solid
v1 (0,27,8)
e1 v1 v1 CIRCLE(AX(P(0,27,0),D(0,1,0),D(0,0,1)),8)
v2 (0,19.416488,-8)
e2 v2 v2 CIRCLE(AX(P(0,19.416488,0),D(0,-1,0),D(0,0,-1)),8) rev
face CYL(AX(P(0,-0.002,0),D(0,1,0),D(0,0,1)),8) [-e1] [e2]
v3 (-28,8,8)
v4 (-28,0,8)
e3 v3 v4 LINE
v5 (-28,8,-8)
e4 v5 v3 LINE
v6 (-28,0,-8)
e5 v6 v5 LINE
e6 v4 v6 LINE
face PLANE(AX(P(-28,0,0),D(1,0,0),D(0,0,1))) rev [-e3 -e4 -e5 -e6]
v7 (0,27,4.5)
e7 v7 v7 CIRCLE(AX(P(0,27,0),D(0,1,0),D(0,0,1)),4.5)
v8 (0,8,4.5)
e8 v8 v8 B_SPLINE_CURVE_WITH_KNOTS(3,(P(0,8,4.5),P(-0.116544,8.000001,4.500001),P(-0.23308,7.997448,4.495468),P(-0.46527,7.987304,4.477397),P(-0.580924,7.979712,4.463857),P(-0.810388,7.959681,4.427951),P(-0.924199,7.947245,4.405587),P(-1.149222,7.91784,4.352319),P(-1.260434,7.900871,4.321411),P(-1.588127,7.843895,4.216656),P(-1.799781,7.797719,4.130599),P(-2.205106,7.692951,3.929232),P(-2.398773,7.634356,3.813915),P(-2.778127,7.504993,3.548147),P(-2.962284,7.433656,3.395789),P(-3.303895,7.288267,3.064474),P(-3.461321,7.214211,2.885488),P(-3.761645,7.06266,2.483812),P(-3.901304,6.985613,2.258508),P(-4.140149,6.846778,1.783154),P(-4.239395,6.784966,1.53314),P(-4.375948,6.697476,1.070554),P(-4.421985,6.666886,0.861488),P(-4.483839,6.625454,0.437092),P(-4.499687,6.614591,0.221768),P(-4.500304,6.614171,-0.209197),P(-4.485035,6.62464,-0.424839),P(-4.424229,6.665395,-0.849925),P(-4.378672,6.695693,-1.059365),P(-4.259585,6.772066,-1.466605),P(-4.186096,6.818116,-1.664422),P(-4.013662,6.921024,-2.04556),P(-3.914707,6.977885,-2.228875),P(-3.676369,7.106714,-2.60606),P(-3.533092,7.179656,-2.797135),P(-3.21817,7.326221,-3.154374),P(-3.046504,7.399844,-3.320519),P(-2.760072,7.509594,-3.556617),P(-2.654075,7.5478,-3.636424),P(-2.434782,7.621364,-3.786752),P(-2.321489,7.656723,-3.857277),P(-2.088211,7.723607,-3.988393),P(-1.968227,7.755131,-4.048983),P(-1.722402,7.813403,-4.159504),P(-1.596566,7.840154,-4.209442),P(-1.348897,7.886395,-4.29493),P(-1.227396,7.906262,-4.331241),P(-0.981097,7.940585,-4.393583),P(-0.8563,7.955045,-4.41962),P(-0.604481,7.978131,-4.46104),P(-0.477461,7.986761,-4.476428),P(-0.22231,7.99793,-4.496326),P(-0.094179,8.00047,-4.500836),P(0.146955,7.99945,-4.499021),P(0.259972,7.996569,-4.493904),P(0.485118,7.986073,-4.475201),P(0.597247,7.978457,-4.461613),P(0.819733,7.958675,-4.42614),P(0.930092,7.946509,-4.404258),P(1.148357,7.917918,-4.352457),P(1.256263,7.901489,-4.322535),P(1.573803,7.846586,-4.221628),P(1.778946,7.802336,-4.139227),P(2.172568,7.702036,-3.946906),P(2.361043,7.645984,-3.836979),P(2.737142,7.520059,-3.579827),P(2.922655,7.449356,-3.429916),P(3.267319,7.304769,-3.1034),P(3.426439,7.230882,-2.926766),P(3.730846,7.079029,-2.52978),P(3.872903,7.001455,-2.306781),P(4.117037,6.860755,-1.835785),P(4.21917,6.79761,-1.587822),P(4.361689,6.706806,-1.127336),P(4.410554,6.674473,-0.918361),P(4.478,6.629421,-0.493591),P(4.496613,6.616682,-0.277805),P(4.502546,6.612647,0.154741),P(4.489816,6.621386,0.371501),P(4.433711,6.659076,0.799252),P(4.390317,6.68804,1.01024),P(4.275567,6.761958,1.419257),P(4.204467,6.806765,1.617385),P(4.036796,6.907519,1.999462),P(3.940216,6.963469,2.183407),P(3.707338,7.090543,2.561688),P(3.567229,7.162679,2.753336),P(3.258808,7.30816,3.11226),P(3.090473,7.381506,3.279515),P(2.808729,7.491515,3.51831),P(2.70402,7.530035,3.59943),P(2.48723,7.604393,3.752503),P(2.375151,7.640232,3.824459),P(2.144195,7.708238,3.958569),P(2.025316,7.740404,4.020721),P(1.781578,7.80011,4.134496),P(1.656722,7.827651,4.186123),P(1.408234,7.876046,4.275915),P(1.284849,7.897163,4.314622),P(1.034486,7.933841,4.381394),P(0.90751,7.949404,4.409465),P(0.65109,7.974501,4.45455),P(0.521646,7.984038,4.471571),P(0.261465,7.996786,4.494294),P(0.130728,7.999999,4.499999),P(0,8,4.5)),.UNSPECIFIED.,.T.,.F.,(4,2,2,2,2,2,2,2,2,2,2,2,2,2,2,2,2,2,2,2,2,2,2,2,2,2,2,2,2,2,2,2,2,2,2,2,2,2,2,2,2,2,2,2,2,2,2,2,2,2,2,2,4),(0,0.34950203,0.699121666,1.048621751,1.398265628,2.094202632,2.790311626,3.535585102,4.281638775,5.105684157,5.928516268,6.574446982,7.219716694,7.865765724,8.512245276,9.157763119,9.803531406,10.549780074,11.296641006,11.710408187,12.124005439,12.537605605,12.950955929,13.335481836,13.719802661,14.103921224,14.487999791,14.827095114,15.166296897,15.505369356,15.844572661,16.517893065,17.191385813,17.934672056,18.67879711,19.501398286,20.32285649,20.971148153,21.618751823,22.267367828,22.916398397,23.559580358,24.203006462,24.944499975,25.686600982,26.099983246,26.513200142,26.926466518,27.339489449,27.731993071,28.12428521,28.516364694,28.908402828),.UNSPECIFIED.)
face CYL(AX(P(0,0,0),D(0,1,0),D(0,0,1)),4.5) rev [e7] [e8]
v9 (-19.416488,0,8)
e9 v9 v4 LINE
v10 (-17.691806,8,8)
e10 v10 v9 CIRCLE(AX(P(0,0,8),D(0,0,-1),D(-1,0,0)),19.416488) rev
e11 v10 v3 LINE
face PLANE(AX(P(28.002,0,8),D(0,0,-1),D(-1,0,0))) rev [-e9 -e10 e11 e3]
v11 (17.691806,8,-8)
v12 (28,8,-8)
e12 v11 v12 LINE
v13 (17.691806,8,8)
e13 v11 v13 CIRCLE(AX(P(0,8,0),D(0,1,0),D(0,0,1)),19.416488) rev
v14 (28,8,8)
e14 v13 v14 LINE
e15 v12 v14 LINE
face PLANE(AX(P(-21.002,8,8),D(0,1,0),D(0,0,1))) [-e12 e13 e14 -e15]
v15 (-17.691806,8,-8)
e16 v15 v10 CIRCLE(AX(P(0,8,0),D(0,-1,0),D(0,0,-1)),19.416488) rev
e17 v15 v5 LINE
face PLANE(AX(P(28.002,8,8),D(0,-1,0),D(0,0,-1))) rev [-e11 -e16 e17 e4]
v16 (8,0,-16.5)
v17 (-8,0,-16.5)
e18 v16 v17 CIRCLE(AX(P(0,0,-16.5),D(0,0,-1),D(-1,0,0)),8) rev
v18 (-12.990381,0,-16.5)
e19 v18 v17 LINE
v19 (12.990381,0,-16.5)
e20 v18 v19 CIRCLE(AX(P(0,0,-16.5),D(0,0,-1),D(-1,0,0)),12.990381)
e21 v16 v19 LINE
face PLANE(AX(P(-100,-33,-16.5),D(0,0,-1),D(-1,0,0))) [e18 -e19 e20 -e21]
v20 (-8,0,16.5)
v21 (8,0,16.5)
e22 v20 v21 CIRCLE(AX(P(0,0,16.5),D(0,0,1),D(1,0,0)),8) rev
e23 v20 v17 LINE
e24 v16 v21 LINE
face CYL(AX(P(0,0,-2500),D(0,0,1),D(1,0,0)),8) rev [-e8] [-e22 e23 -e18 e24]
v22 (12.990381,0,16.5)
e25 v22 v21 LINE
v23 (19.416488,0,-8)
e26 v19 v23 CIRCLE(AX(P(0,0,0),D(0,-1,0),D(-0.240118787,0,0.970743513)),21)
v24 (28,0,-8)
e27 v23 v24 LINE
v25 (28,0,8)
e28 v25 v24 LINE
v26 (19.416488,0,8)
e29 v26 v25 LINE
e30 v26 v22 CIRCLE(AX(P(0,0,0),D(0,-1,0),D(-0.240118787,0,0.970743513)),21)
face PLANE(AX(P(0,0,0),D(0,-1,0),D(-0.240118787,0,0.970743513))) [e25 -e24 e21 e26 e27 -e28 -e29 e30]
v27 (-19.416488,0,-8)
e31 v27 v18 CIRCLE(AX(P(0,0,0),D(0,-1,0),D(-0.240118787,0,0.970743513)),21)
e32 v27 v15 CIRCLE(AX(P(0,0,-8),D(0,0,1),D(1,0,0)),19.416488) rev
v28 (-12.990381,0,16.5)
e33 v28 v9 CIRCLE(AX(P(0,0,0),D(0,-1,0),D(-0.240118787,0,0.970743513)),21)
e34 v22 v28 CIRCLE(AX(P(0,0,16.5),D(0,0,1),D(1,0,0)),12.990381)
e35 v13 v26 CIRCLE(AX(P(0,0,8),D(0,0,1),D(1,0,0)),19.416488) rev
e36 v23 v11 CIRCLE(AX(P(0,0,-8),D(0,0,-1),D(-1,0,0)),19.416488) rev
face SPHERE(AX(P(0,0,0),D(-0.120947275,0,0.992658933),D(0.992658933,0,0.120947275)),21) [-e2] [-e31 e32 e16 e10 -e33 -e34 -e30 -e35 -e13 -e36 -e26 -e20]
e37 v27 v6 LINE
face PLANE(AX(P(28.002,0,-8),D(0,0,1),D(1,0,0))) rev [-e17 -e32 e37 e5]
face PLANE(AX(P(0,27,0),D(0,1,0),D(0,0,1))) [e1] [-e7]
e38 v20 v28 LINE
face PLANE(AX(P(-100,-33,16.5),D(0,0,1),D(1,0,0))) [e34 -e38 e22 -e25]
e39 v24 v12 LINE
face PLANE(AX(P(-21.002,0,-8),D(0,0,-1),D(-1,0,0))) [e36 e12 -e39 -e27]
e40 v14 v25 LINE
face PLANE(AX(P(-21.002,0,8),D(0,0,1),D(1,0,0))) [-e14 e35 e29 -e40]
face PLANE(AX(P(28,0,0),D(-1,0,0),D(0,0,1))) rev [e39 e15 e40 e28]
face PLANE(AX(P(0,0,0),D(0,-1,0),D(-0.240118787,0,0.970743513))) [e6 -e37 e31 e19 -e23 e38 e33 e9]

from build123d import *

# Parameters (mm, degrees)
REVOLVE_2_ANGLE         = 180
EXTRUDE_1_REACH         = 59.297
EXTRUDE_1_END_RADIUS    = 21
SKETCH_3_W              = 16
SKETCH_3_H              = 8
EXTRUDE_2_REACH         = 46.204
EXTRUDE_2_END_RADIUS    = 21
SKETCH_6_R              = 8
SKETCH_7_R              = 4.5
CUT_EXTRUDE_1_DEPTH     = 45.204072223
SKETCH_8_R              = 8
CUT_EXTRUDE_2_DEPTH     = 2500
CUT_EXTRUDE_START       = -27
CUT_EXTRUDE_3_OUTLINE_W = 28
CUT_EXTRUDE_3_OUTLINE_H = 4.5
CUT_EXTRUDE_3_DEPTH     = 12.990381057


# Read off the part's stored shape, not the designer's step: 切除-拉伸3
with BuildPart() as part:
    # 草图2 → 旋转2 (revolve)
    with BuildSketch(Plane(origin=(0, 0, 0), x_dir=(1, 0, 0), z_dir=(0, 1, 0))):
        with BuildLine():
            Line((-2.539892785, -20.845837586), (2.539892785, 20.845837586))
            ThreePointArc((2.539892785, 20.845837586), (-20.845837586, 2.539892785), (-2.539892785, -20.845837586))
        make_face()
    revolve(axis=Axis((-2.539892785, 0, 20.845837586), (0.12094727545633621, 0, -0.9926589326448885)), revolution_arc=REVOLVE_2_ANGLE)

    # 凸台-拉伸1: up to this sphere (the profile starts outside it)
    extrude_1_end = Location((0, 0, 0)) * Sphere(EXTRUDE_1_END_RADIUS, mode=Mode.PRIVATE)
    # 草图3 → 凸台-拉伸1 (add, up to the surface)
    with BuildSketch(Plane(origin=(28, 0, 0), x_dir=(0, 0, -1), z_dir=(1, 0, 0)), mode=Mode.PRIVATE) as extrude_1_sk1:
        with Locations((0, 4)):
            Rectangle(SKETCH_3_W, SKETCH_3_H)
    extrude_1_tool1 = extrude(extrude_1_sk1.sketch, amount=-EXTRUDE_1_REACH, mode=Mode.PRIVATE) - extrude_1_end
    extrude_1 = extrude_1_tool1.solids().sort_by_distance((28, 4, 0))[0]
    add(extrude_1)

    # 镜向1: 凸台-拉伸1 across plane
    add(extrude_1.mirror(Plane(origin=(0, 0, 0), x_dir=(0, 0, 1), z_dir=(1, 0, 0))))

    # 凸台-拉伸2: up to this sphere (the profile starts outside it)
    extrude_2_end = Location((0, 0, 0)) * Sphere(EXTRUDE_2_END_RADIUS, mode=Mode.PRIVATE)
    # 草图6 → 凸台-拉伸2 (add, up to the surface)
    with BuildSketch(Plane(origin=(0, 27, 0), x_dir=(1, 0, 0), z_dir=(0, 1, 0)), mode=Mode.PRIVATE) as extrude_2_sk1:
        with Locations(Location((0, 0, 0), (0, 0, 270))):
            Circle(SKETCH_6_R)
    extrude_2_tool1 = extrude(extrude_2_sk1.sketch, amount=-EXTRUDE_2_REACH, mode=Mode.PRIVATE) - extrude_2_end
    add(extrude_2_tool1.solids().sort_by_distance((0, 27, 0))[0])

    # 草图7 → 切除-拉伸1 (cut, through all)
    with BuildSketch(Plane(origin=(0, 27, 0), x_dir=(1, 0, 0), z_dir=(0, 1, 0))):
        with Locations(Location((0, 0, 0), (0, 0, 270))):
            Circle(SKETCH_7_R)
    extrude(amount=-CUT_EXTRUDE_1_DEPTH, mode=Mode.SUBTRACT)

    # 草图8 → 切除-拉伸2 (cut, symmetric)
    with BuildSketch(Plane.XY):
        Circle(SKETCH_8_R)
    extrude(amount=CUT_EXTRUDE_2_DEPTH, both=True, mode=Mode.SUBTRACT)

    # 切除-拉伸3 outline → 切除-拉伸3 (cut)
    with BuildSketch(Plane(origin=(0, 27, 0), x_dir=(1, 0, 0), z_dir=(0, 1, 0)).offset(CUT_EXTRUDE_START)):
        with Locations((0, 18.75)):
            Rectangle(CUT_EXTRUDE_3_OUTLINE_W, CUT_EXTRUDE_3_OUTLINE_H)
        with Locations((0, -18.75)):
            Rectangle(CUT_EXTRUDE_3_OUTLINE_W, CUT_EXTRUDE_3_OUTLINE_H)
    extrude(amount=CUT_EXTRUDE_3_DEPTH, mode=Mode.SUBTRACT)


solid = part.part
